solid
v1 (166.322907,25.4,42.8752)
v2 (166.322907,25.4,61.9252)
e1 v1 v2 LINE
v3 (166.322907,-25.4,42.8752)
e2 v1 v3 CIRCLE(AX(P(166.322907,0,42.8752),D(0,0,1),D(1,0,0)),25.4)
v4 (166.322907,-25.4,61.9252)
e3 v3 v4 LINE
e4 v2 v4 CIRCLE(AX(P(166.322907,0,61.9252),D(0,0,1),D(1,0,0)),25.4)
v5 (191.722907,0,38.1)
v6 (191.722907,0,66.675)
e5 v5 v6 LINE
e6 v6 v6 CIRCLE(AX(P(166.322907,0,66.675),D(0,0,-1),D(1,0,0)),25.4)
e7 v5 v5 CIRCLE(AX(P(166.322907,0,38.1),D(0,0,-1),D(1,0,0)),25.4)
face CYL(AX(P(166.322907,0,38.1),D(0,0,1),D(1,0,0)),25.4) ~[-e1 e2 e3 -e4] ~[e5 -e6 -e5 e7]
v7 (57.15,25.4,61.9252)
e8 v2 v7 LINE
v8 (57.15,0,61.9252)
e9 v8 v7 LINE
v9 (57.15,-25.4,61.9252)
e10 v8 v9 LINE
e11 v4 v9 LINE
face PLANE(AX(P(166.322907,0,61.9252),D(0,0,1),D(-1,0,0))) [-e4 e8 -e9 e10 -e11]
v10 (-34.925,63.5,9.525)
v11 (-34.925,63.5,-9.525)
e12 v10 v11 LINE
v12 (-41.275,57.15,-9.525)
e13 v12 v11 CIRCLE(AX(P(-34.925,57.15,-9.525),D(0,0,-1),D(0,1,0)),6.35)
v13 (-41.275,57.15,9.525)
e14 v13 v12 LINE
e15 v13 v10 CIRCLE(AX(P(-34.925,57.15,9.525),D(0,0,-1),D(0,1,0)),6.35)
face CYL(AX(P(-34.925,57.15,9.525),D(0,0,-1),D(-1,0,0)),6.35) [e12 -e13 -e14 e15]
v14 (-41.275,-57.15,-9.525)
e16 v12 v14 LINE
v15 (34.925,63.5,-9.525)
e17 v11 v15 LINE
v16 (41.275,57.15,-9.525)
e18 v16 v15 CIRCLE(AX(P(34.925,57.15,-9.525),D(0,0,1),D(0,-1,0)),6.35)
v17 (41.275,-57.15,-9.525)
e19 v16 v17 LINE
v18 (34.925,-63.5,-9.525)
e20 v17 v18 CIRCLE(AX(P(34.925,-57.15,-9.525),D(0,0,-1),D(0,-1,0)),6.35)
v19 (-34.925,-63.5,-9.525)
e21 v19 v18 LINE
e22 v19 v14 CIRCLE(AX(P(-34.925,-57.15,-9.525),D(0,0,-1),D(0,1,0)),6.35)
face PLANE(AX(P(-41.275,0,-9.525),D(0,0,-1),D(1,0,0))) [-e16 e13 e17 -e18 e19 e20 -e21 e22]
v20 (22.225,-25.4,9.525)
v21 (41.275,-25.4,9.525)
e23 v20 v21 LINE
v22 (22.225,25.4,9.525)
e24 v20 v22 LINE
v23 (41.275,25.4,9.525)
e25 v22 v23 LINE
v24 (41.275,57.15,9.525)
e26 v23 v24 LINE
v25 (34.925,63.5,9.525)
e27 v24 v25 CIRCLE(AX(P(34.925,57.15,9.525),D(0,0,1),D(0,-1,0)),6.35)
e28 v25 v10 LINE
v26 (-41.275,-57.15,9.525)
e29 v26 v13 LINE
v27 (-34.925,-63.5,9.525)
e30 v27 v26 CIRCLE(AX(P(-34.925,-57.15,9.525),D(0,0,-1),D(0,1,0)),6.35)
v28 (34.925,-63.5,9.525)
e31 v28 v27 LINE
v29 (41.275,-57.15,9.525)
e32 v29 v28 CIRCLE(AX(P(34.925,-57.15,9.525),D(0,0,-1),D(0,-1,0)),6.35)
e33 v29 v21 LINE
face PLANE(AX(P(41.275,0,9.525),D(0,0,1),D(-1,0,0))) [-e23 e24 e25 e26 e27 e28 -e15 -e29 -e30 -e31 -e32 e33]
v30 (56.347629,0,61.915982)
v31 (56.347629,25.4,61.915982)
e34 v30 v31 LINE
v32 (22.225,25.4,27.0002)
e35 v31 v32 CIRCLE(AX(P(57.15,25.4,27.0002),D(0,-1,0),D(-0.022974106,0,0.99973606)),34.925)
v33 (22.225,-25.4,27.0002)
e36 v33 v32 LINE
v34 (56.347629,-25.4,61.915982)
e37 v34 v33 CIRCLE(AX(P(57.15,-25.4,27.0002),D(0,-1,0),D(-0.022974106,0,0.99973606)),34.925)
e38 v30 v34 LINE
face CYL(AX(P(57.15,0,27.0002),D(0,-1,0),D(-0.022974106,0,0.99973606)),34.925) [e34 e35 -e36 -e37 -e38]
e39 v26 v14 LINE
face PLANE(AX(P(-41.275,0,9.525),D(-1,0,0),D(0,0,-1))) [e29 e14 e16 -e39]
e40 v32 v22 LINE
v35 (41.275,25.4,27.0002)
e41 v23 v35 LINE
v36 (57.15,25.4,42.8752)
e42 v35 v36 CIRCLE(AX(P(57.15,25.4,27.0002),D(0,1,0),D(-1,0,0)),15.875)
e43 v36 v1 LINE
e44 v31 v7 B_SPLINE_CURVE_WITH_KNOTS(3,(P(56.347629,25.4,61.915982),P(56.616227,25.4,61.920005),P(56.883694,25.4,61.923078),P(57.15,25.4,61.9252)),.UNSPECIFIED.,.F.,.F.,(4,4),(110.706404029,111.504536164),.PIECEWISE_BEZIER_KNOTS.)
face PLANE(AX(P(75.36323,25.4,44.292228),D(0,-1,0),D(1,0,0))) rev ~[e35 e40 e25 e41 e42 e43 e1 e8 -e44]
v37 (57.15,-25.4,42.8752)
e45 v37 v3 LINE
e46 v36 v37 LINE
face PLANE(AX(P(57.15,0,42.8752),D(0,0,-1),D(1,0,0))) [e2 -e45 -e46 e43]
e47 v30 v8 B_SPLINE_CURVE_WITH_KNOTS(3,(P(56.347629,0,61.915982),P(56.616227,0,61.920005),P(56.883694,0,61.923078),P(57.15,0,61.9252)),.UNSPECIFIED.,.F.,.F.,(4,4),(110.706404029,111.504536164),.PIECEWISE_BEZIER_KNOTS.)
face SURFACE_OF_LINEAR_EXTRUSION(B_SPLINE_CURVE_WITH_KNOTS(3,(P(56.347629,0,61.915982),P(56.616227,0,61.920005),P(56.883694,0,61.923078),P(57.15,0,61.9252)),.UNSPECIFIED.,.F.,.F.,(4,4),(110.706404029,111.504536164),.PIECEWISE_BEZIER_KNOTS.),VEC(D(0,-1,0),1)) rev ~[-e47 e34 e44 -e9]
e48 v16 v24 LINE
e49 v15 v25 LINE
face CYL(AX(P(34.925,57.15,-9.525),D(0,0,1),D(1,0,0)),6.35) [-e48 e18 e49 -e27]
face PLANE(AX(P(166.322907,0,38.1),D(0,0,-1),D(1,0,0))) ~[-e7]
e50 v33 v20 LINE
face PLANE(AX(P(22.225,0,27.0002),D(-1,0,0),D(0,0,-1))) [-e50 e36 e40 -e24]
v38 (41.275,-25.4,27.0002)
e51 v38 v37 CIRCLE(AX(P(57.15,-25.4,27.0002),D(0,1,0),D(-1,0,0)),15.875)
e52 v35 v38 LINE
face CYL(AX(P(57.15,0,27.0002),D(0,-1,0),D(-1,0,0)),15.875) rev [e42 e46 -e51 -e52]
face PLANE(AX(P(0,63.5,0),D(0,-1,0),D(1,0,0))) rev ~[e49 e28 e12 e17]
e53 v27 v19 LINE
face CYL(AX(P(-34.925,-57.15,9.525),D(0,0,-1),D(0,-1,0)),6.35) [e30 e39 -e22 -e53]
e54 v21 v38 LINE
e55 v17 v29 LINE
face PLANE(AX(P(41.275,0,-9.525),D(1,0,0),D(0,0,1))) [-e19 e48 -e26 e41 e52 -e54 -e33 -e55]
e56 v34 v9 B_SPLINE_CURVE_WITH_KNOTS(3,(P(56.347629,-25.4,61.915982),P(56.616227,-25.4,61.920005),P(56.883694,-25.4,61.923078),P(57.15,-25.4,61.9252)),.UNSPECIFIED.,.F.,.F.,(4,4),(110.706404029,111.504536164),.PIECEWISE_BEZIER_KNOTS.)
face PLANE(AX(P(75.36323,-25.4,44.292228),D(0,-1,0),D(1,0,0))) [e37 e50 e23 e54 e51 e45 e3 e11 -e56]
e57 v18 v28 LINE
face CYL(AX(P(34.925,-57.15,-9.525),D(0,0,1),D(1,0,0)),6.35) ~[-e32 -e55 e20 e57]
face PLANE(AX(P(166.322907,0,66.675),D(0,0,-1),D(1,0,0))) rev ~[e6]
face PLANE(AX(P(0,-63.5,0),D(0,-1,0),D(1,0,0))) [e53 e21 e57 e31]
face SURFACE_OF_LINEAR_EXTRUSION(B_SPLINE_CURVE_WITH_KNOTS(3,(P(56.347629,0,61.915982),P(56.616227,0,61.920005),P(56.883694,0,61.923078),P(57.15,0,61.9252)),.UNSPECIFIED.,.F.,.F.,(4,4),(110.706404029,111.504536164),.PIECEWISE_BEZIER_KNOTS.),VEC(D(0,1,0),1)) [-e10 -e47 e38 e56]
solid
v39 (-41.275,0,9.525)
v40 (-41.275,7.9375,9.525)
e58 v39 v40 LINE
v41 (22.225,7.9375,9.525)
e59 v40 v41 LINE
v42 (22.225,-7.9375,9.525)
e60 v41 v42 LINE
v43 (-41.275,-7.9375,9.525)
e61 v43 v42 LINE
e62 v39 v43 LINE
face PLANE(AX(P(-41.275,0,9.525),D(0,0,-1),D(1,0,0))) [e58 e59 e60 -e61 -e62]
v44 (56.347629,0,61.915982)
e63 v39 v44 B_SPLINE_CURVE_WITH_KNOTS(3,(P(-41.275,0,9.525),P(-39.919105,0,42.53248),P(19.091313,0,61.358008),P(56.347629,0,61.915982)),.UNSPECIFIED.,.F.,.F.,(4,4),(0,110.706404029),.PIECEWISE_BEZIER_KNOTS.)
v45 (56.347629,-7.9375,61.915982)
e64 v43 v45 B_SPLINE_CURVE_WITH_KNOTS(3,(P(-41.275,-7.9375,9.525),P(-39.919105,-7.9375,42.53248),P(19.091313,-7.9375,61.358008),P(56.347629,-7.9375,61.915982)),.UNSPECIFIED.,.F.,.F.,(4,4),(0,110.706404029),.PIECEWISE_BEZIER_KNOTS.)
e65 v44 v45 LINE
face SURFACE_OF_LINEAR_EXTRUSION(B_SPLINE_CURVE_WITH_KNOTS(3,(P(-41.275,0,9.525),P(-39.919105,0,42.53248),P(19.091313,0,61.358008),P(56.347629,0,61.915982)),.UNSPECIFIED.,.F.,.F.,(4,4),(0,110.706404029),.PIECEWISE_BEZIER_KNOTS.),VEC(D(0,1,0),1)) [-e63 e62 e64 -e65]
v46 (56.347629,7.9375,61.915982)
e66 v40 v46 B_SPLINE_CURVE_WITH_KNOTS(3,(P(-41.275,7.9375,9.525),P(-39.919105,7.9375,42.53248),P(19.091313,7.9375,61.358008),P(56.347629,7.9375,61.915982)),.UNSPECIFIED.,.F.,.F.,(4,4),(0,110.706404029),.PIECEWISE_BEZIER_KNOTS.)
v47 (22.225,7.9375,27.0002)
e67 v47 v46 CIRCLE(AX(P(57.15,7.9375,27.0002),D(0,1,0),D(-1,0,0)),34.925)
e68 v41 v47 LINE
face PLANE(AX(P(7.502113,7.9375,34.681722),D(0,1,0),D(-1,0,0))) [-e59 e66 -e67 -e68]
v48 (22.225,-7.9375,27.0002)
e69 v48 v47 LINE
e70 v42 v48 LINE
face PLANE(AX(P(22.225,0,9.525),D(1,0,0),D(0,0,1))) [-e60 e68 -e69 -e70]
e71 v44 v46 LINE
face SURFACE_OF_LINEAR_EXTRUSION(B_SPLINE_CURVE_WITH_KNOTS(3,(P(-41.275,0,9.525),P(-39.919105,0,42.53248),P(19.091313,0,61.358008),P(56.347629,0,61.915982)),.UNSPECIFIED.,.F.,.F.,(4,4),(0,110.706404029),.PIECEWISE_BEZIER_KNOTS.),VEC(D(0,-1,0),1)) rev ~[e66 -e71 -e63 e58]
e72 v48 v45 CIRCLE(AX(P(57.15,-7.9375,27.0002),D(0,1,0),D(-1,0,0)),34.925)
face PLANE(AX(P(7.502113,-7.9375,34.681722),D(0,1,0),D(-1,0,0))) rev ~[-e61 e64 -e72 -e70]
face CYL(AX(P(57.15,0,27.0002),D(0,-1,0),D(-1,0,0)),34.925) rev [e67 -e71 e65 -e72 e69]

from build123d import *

# Parameters (mm, degrees)
F1_DEPTH = 63.5
F2_DEPTH = 7.9375
F0_W     = 25.4
F0_H     = 19.05
F3_DEPTH = 25.4
F5_R     = 6.35


with BuildPart() as f1:
    # F0 (on Front) → F1 (new body, symmetric)
    with BuildSketch(Plane.XZ):
        Polygon((-41.275, 9.525), (-41.275, -9.525), (41.275, -9.525), (41.275, 9.525), (22.225, 9.525), align=None)
    extrude(amount=F1_DEPTH, both=True)

    # F0 (on Front) → F3 (join, symmetric)
    with BuildSketch(Plane.XZ):
        with BuildLine():
            Line((22.225, 9.525), (41.275, 9.525))
            Line((41.275, 9.525), (41.275, 27.0002))
            ThreePointArc((41.275, 27.0002), (45.9246798487, 38.2255201513), (57.15, 42.8752))
            Line((57.15, 42.8752), (140.9229072666, 42.8752))
            Line((140.9229072666, 42.8752), (140.9229072666, 61.9252))
            Line((140.9229072666, 61.9252), (57.15, 61.9252))
            add(Edge.make_bspline(
                [(56.3476293335, 61.915981909), (56.6162268353, 61.9200045934), (56.8836936428, 61.9230778008), (57.15, 61.9252)],
                knots=[110.7064040288, 110.7064040288, 110.7064040288, 110.7064040288, 111.5045361635, 111.5045361635, 111.5045361635, 111.5045361635], degree=3))
            ThreePointArc((56.3476293335, 61.915981909), (32.1722256743, 51.4105751453), (22.225, 27.0002))
            Line((22.225, 27.0002), (22.225, 9.525))
        make_face()
        with Locations((153.6229072666, 52.4002)):
            Rectangle(F0_W, F0_H)
    extrude(amount=F3_DEPTH, both=True)

    # F0 (on Front) → F4 (revolve)
    with BuildSketch(Plane.XZ):
        Polygon((166.3229072666, 66.675), (166.3229072666, 61.9252), (166.3229072666, 42.8752), (166.3229072666, 38.1), (191.7229072666, 38.1), (191.7229072666, 66.675), align=None)
    revolve(axis=Axis((166.3229072666, 0, 52.3875), (0, 0, -1)))

    # F5
    f5_edges = [f1.edges().sort_by_distance(p)[0] for p in [
        (41.275, -63.5, 0),
        (-41.275, -63.5, 0),
        (-41.275, 63.5, 0),
        (41.275, 63.5, 0),
    ]]
    fillet(f5_edges, radius=F5_R)


with BuildPart() as f2:
    # F0 (on Front) → F2 (new body, symmetric)
    with BuildSketch(Plane.XZ):
        with BuildLine():
            add(Edge.make_bspline(
                [(-41.275, 9.525), (-39.9191045242, 42.5324796176), (19.0913126511, 61.3580079673), (56.3476293335, 61.915981909)],
                knots=[0, 0, 0, 0, 110.7064040288, 110.7064040288, 110.7064040288, 110.7064040288], degree=3))
            Line((-41.275, 9.525), (22.225, 9.525))
            Line((22.225, 9.525), (22.225, 27.0002))
            ThreePointArc((22.225, 27.0002), (32.1722256743, 51.4105751453), (56.3476293335, 61.915981909))
        make_face()
    extrude(amount=F2_DEPTH, both=True)


solid = Compound([f1.part, f2.part])
